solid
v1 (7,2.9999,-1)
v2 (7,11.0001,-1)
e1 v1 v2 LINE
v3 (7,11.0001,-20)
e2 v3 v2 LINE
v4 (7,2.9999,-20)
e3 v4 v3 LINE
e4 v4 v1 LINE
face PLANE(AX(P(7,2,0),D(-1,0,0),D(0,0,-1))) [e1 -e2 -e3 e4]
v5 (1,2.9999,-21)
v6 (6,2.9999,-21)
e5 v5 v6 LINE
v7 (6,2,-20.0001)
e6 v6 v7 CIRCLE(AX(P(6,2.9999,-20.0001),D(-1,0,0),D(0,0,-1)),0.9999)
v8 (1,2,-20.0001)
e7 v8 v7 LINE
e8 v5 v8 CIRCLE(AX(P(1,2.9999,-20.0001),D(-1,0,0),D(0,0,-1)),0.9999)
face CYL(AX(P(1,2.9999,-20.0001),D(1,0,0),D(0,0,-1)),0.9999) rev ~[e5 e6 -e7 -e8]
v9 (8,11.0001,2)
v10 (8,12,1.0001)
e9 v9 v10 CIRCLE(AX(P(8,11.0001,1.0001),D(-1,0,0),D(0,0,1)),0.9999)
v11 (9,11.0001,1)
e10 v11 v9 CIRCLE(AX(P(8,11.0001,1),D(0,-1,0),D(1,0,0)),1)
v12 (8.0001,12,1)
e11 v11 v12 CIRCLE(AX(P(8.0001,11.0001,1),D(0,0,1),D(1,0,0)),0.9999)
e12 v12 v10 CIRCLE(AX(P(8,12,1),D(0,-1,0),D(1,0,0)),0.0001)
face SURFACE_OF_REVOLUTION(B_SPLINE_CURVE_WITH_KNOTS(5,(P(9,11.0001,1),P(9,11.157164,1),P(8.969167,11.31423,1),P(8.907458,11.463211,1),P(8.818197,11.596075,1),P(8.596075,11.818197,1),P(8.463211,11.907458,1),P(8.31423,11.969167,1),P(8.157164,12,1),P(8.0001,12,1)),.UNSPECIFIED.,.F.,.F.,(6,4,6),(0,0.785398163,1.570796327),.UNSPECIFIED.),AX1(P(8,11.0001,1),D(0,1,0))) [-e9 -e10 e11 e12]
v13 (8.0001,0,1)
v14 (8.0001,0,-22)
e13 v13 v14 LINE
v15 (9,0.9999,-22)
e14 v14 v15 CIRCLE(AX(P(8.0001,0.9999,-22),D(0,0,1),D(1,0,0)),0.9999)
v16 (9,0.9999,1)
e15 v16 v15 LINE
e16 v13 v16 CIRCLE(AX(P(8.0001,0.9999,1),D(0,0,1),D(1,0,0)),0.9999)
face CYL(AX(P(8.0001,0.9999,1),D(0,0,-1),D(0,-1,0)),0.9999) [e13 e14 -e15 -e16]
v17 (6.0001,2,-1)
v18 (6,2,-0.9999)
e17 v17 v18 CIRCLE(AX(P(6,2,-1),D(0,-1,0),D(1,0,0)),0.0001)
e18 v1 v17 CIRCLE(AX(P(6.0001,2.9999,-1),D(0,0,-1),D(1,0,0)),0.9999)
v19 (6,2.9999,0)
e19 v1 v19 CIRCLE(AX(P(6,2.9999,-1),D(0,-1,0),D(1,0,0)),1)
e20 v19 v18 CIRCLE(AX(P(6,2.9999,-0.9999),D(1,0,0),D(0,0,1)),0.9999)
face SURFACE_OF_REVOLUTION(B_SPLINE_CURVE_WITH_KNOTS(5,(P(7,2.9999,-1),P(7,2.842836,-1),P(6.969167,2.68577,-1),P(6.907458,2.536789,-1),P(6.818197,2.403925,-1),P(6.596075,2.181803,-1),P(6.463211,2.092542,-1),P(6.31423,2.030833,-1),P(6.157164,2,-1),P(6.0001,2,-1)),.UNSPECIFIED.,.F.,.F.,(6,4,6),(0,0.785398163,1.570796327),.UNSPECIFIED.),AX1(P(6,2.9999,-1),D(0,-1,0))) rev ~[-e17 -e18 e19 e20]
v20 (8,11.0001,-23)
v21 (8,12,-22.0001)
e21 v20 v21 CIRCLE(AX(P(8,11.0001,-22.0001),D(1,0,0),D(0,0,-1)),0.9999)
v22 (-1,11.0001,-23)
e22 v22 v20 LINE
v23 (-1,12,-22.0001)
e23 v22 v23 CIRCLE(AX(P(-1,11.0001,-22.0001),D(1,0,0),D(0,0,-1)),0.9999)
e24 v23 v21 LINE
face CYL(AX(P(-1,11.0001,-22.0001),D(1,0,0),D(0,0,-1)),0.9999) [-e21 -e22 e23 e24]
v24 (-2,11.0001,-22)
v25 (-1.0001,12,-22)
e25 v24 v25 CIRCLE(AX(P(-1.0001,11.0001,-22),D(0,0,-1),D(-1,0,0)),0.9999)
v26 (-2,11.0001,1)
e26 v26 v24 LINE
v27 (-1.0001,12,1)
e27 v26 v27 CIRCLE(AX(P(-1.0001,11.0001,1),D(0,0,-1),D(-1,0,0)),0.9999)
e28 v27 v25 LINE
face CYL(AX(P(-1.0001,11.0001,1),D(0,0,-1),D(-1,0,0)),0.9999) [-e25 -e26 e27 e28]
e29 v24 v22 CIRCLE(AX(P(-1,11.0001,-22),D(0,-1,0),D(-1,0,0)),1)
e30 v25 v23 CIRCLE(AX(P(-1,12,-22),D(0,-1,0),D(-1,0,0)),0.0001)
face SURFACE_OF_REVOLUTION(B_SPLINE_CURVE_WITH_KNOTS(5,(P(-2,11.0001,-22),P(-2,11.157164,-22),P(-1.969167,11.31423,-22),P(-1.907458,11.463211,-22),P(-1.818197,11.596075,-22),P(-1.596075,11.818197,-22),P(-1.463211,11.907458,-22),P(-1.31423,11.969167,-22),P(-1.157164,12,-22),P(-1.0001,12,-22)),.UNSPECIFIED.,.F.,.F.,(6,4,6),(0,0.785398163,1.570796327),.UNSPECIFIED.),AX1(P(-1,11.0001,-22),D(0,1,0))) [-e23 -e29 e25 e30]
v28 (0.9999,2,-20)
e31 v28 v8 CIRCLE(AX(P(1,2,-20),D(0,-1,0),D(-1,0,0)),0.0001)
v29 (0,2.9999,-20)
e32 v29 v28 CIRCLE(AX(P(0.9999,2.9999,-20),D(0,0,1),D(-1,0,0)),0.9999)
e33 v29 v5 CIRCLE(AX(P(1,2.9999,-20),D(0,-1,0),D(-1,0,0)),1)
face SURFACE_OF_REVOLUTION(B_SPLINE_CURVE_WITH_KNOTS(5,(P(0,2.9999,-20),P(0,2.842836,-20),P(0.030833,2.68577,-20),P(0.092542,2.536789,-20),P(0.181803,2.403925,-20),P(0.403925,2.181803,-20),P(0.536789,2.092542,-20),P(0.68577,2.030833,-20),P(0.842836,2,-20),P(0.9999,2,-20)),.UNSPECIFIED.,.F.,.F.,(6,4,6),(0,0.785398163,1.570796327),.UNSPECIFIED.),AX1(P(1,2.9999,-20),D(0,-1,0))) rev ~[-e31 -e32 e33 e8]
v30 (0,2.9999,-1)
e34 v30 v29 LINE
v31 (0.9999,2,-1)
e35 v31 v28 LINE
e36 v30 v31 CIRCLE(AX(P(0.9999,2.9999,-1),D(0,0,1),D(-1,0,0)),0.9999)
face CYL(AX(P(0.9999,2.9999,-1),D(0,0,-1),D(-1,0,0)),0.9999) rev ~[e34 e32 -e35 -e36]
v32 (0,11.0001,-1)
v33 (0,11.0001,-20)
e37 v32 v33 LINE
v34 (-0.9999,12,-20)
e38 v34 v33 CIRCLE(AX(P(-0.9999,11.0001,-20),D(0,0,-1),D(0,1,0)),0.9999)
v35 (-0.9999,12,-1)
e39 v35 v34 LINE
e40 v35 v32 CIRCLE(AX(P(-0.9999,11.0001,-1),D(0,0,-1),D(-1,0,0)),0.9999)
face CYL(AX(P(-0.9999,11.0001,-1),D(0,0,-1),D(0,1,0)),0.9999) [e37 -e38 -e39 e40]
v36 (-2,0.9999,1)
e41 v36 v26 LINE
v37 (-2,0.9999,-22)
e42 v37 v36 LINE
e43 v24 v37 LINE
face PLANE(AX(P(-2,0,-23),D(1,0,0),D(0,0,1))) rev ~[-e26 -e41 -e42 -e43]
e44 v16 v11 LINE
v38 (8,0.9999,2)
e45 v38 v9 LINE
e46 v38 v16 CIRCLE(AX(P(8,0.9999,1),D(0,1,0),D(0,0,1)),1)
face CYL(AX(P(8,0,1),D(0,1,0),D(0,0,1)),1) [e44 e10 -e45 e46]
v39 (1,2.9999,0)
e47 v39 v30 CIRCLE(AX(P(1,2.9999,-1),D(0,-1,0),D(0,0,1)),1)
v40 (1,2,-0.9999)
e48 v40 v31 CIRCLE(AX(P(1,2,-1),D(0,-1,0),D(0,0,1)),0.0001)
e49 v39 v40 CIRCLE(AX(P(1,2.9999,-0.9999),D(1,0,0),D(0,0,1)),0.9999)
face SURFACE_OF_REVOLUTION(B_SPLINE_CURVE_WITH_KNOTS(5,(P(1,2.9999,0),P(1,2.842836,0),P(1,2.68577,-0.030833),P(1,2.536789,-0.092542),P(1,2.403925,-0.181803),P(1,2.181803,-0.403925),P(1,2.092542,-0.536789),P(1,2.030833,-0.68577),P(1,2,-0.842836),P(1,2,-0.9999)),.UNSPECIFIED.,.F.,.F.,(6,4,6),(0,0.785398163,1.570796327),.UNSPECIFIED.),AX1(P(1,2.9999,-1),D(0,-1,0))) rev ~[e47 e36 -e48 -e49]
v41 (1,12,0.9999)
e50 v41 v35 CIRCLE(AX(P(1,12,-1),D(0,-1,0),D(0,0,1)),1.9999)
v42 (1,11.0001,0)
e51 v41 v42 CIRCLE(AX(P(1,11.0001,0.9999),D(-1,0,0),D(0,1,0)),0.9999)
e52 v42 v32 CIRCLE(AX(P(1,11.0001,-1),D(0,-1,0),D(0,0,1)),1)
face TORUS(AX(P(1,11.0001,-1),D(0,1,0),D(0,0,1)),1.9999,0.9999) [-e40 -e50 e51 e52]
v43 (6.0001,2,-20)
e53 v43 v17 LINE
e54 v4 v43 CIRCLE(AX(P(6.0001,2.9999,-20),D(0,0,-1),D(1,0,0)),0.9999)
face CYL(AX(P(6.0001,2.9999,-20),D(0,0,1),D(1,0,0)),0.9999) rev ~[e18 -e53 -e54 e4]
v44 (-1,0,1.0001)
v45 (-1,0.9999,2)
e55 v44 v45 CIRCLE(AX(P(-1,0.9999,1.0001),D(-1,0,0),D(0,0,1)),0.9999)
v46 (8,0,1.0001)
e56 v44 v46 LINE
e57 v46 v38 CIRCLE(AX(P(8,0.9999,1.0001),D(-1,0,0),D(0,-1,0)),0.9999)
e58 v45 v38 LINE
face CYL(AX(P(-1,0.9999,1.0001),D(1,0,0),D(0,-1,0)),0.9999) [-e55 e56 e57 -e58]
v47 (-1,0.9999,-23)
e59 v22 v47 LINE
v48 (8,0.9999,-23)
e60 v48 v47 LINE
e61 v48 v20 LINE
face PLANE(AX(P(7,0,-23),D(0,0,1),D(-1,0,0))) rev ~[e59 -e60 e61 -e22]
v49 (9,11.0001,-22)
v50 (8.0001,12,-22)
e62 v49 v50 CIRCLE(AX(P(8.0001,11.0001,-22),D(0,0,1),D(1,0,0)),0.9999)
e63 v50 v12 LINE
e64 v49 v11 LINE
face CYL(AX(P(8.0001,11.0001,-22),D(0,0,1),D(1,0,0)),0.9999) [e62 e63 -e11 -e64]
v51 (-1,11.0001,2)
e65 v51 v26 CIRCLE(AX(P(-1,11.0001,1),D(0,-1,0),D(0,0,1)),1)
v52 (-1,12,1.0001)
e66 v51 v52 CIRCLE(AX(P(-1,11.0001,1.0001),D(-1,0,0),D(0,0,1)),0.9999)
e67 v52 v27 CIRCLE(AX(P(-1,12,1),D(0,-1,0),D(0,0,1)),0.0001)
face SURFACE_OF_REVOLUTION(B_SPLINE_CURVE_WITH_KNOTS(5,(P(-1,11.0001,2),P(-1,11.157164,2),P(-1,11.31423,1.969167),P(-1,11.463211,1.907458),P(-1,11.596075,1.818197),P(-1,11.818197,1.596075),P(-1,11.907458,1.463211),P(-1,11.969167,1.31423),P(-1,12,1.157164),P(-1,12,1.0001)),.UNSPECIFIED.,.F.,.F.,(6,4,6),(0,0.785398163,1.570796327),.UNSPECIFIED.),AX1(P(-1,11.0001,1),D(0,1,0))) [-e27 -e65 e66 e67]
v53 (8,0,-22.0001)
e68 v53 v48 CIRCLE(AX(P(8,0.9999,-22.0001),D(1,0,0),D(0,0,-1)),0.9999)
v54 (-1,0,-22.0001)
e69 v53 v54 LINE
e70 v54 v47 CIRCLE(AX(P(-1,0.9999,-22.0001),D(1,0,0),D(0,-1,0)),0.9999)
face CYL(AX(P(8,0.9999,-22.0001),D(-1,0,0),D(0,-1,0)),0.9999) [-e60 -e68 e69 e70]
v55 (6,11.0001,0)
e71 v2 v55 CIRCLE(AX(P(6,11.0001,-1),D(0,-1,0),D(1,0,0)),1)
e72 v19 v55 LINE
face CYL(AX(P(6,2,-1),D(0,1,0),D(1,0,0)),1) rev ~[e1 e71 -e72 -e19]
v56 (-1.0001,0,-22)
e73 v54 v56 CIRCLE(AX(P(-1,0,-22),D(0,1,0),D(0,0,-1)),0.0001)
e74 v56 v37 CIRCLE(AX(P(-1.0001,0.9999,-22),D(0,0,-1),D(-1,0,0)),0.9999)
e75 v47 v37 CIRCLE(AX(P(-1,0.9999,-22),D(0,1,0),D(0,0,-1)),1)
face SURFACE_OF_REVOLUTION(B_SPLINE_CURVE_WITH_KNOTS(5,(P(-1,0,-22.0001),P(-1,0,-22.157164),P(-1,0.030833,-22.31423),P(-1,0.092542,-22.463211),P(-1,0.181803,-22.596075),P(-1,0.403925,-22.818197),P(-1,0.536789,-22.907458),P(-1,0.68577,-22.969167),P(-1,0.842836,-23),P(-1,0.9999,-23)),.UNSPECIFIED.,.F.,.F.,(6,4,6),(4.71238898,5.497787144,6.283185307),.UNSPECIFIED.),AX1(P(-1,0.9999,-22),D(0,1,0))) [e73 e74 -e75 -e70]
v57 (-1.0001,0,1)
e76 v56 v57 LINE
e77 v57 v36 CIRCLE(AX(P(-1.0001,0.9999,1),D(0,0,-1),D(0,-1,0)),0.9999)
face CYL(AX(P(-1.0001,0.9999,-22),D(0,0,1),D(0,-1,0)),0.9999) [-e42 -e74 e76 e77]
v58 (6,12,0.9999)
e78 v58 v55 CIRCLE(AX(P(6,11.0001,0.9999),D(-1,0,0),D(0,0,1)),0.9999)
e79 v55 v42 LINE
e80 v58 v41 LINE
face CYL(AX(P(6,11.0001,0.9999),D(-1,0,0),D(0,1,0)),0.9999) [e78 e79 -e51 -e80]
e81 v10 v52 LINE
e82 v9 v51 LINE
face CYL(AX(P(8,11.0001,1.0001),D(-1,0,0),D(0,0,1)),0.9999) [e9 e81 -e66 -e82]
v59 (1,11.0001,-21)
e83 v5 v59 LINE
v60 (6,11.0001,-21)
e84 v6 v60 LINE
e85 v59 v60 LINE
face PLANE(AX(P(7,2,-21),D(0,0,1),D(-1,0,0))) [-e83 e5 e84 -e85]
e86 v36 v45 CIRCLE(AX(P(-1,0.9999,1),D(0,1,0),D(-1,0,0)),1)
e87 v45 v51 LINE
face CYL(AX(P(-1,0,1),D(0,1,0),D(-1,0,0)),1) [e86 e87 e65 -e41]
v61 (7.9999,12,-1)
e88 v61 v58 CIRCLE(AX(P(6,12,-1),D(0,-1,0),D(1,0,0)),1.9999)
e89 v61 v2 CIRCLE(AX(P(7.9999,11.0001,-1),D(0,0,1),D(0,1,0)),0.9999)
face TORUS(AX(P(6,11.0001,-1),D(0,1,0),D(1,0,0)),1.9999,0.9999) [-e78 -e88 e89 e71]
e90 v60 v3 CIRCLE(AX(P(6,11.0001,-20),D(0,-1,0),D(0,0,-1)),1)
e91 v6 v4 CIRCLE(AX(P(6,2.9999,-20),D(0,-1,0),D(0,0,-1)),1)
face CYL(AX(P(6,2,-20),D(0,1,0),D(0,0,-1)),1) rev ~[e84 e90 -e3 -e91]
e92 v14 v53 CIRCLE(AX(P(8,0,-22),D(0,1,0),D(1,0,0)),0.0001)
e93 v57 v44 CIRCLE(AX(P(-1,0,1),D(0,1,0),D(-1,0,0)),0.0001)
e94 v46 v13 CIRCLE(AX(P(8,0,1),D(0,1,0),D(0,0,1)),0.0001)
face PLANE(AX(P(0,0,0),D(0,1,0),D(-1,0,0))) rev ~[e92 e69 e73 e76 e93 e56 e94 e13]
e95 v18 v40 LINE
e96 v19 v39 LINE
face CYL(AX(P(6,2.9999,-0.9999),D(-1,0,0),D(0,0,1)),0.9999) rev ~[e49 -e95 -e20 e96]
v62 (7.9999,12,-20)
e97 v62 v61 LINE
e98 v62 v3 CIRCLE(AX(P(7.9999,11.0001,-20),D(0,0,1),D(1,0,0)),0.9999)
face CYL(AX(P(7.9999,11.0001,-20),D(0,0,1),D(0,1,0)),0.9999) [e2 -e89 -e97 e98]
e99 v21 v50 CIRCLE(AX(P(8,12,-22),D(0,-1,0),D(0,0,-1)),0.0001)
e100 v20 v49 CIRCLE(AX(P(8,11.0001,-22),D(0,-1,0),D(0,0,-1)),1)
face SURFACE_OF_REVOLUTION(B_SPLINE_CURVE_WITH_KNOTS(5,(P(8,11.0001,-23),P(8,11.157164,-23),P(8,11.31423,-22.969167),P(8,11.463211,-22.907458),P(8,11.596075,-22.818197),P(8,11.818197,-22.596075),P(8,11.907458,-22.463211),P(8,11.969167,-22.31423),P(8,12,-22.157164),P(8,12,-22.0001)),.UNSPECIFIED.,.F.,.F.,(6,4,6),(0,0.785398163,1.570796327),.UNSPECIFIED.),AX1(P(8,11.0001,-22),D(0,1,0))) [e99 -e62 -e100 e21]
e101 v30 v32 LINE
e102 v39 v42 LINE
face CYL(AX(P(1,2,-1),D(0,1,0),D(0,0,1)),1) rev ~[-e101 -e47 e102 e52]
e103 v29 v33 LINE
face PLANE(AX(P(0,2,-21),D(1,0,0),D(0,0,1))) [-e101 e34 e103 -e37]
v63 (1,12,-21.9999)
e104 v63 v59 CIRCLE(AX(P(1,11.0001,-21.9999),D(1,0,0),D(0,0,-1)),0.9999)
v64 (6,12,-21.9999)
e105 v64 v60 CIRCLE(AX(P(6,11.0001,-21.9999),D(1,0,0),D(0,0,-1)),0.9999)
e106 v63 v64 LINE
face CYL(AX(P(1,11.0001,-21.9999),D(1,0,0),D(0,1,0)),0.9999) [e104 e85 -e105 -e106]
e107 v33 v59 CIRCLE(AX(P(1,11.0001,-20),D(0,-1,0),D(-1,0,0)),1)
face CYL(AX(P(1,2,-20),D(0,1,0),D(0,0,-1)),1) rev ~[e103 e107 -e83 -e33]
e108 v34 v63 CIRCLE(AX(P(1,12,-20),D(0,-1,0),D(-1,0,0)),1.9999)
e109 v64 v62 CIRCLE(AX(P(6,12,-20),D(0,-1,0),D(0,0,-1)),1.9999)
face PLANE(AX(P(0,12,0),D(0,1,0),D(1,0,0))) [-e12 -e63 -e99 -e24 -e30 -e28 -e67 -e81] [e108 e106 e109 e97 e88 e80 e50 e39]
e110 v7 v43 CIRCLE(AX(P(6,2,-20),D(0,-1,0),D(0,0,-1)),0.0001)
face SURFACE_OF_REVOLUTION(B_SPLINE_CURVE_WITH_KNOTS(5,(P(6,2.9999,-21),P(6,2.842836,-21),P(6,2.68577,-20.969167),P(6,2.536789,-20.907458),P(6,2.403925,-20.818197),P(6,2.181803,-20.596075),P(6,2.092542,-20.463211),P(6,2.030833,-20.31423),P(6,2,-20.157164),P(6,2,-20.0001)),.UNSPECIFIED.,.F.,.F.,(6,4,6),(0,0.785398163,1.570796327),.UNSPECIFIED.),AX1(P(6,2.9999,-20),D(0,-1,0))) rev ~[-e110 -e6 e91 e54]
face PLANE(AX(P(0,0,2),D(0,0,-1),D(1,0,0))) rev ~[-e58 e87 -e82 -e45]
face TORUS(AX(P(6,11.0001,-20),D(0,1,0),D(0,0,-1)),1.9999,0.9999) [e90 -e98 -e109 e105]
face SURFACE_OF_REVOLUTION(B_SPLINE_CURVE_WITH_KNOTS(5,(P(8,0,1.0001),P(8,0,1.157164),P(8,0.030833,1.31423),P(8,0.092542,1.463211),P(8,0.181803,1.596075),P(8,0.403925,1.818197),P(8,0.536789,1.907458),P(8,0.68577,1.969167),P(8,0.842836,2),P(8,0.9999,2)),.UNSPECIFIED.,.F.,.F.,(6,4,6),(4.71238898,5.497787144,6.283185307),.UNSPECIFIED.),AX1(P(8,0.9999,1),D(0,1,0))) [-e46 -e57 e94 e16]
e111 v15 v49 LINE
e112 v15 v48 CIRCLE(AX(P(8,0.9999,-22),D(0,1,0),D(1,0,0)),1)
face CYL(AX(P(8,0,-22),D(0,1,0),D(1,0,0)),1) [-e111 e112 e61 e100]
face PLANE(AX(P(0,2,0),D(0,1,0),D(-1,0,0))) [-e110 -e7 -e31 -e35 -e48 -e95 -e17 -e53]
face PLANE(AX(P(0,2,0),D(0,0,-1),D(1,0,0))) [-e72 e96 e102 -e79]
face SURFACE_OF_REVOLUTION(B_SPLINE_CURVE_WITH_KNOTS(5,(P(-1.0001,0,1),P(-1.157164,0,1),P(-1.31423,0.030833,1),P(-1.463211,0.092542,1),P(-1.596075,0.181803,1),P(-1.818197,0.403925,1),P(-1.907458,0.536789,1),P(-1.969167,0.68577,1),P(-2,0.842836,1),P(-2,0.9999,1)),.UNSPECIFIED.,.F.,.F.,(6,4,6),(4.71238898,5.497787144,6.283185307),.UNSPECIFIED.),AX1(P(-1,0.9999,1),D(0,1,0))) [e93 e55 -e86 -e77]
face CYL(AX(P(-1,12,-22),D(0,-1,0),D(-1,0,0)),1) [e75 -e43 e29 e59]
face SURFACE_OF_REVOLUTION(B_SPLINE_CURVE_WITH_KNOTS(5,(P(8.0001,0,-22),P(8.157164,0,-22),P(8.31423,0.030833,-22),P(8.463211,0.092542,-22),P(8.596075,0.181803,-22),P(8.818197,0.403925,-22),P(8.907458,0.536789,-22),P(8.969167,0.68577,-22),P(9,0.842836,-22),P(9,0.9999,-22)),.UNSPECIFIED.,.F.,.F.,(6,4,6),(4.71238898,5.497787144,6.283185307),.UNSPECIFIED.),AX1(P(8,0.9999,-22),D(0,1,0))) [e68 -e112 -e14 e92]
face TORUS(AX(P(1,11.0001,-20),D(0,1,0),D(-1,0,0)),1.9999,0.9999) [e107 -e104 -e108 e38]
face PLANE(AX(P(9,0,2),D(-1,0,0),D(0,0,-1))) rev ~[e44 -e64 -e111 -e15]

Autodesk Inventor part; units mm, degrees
ref_plane "YZ Plane" through (0, 0, 0) normal (1, 0, 0) x (0, 1, 0)
ref_plane "XZ Plane" through (0, 0, 0) normal (0, 1, 0) x (-1, 0, 0)
ref_plane "XY Plane" through (0, 0, 0) normal (0, 0, 1) x (1, 0, 0)
sketch "Sketch1" plane through (0, 0, 0) normal (0, 1, 0) x (-1, 0, 0)
  line L0 (0, 0) -> (-7, 0)
  line L1 (-7, 0) -> (-7, -21)
  line L2 (-7, -21) -> (0, -21)
  line L3 (0, -21) -> (0, 0)
  line L4 (0, 0) -> (2, 0)
  line L5 (2, 0) -> (2, 2)
  line L6 (2, 2) -> (0, 2)
  line L7 (0, 2) -> (0, 0)
  line L8 (-7, -21) -> (-9, -21)
  line L9 (-9, -21) -> (-9, -23)
  line L10 (-9, -23) -> (-7, -23)
  line L11 (-7, -23) -> (-7, -21)
  line L12 (-9, -23) -> (2, -23)
  line L13 (2, -23) -> (2, 2)
  line L14 (2, 2) -> (-9, 2)
  line L15 (-9, 2) -> (-9, -23)
  dimension "d0" = 7
  dimension "d1" = 21
  dimension "d2" = 2
  dimension "d3" = 2
  dimension "d4" = 2
  dimension "d5" = 2
extrude "Extrusion1" add sketch "Sketch1" along normal blind 2
sketch "Sketch2" plane through (0, 2, 0) normal (0, 1, 0) x (1, 0, 0)
  line L0 (-2, -2) -> (9, -2) projected
  line L1 (-2, -2) -> (0, -2)
  line L2 (0, -2) -> (0, 0)
  line L3 (0, 0) -> (-2, 0)
  line L4 (-2, 0) -> (-2, -2)
  line L5 (9, -2) -> (9, 23) projected
  line L6 (9, 23) -> (7, 23)
  line L7 (7, 23) -> (7, 21)
  line L8 (7, 21) -> (9, 21)
  line L9 (9, 21) -> (9, 23)
  line L10 (0, 0) -> (7, 0)
  line L11 (7, 0) -> (7, 21)
  line L12 (7, 21) -> (0, 21)
  line L13 (0, 21) -> (0, 0)
  line L14 (-2, 23) -> (-2, -2) projected
  line L15 (-2, -2) -> (9, -2)
  line L16 (9, -2) -> (9, 23)
  line L17 (9, 23) -> (-2, 23)
  line L18 (-2, 23) -> (-2, -2)
  dimension "d8" = 2
  dimension "d9" = 2
  dimension "d10" = 2
  dimension "d11" = 2
extrude "Extrusion2" add sketch "Sketch2" along normal blind 10 contours L4 L3 L2 L0 | L2 L10 L11 L8 L5 L0 | L14 L17 L7 L12 L13 L3 | L8 L7 L6 L5
fillet "Fillet1" radius 1 8 edges at (0, 7, -21) (0, 7, 0) (7, 7, 0) (7, 7, -21) (9, 6, 2) (-2, 6, 2) (-2, 6, -23) (9, 6, -23)
fillet "Fillet2" radius 1 32 edges at (0.2929, 2, -0.2929) (3.5, 2, 0) (6.7071, 2, -0.2929) (7, 2, -10.5) (6.7071, 2, -20.7071) (3.5, 2, -21) (0.2929, 2, -20.7071) (0, 2, -10.5) (6.7071, 12, -20.7071) (7, 12, -10.5) (6.7071, 12, -0.2929) (3.5, 12, 0) (0.2929, 12, -0.2929) (0, 12, -10.5) (0.2929, 12, -20.7071) (3.5, 12, -21) (-1.7071, 12, -22.7071) (-2, 12, -10.5) (-1.7071, 12, 1.7071) (3.5, 12, 2) (8.7071, 12, 1.7071) (9, 12, -10.5) (8.7071, 12, -22.7071) (3.5, 12, -23) (8.7071, 0, -22.7071) (3.5, 0, -23) (-1.7071, 0, -22.7071) (-2, 0, -10.5) (-1.7071, 0, 1.7071) (3.5, 0, 2) (8.7071, 0, 1.7071) (9, 0, -10.5)
properties part number "MechanicalPencilLeadCap"
